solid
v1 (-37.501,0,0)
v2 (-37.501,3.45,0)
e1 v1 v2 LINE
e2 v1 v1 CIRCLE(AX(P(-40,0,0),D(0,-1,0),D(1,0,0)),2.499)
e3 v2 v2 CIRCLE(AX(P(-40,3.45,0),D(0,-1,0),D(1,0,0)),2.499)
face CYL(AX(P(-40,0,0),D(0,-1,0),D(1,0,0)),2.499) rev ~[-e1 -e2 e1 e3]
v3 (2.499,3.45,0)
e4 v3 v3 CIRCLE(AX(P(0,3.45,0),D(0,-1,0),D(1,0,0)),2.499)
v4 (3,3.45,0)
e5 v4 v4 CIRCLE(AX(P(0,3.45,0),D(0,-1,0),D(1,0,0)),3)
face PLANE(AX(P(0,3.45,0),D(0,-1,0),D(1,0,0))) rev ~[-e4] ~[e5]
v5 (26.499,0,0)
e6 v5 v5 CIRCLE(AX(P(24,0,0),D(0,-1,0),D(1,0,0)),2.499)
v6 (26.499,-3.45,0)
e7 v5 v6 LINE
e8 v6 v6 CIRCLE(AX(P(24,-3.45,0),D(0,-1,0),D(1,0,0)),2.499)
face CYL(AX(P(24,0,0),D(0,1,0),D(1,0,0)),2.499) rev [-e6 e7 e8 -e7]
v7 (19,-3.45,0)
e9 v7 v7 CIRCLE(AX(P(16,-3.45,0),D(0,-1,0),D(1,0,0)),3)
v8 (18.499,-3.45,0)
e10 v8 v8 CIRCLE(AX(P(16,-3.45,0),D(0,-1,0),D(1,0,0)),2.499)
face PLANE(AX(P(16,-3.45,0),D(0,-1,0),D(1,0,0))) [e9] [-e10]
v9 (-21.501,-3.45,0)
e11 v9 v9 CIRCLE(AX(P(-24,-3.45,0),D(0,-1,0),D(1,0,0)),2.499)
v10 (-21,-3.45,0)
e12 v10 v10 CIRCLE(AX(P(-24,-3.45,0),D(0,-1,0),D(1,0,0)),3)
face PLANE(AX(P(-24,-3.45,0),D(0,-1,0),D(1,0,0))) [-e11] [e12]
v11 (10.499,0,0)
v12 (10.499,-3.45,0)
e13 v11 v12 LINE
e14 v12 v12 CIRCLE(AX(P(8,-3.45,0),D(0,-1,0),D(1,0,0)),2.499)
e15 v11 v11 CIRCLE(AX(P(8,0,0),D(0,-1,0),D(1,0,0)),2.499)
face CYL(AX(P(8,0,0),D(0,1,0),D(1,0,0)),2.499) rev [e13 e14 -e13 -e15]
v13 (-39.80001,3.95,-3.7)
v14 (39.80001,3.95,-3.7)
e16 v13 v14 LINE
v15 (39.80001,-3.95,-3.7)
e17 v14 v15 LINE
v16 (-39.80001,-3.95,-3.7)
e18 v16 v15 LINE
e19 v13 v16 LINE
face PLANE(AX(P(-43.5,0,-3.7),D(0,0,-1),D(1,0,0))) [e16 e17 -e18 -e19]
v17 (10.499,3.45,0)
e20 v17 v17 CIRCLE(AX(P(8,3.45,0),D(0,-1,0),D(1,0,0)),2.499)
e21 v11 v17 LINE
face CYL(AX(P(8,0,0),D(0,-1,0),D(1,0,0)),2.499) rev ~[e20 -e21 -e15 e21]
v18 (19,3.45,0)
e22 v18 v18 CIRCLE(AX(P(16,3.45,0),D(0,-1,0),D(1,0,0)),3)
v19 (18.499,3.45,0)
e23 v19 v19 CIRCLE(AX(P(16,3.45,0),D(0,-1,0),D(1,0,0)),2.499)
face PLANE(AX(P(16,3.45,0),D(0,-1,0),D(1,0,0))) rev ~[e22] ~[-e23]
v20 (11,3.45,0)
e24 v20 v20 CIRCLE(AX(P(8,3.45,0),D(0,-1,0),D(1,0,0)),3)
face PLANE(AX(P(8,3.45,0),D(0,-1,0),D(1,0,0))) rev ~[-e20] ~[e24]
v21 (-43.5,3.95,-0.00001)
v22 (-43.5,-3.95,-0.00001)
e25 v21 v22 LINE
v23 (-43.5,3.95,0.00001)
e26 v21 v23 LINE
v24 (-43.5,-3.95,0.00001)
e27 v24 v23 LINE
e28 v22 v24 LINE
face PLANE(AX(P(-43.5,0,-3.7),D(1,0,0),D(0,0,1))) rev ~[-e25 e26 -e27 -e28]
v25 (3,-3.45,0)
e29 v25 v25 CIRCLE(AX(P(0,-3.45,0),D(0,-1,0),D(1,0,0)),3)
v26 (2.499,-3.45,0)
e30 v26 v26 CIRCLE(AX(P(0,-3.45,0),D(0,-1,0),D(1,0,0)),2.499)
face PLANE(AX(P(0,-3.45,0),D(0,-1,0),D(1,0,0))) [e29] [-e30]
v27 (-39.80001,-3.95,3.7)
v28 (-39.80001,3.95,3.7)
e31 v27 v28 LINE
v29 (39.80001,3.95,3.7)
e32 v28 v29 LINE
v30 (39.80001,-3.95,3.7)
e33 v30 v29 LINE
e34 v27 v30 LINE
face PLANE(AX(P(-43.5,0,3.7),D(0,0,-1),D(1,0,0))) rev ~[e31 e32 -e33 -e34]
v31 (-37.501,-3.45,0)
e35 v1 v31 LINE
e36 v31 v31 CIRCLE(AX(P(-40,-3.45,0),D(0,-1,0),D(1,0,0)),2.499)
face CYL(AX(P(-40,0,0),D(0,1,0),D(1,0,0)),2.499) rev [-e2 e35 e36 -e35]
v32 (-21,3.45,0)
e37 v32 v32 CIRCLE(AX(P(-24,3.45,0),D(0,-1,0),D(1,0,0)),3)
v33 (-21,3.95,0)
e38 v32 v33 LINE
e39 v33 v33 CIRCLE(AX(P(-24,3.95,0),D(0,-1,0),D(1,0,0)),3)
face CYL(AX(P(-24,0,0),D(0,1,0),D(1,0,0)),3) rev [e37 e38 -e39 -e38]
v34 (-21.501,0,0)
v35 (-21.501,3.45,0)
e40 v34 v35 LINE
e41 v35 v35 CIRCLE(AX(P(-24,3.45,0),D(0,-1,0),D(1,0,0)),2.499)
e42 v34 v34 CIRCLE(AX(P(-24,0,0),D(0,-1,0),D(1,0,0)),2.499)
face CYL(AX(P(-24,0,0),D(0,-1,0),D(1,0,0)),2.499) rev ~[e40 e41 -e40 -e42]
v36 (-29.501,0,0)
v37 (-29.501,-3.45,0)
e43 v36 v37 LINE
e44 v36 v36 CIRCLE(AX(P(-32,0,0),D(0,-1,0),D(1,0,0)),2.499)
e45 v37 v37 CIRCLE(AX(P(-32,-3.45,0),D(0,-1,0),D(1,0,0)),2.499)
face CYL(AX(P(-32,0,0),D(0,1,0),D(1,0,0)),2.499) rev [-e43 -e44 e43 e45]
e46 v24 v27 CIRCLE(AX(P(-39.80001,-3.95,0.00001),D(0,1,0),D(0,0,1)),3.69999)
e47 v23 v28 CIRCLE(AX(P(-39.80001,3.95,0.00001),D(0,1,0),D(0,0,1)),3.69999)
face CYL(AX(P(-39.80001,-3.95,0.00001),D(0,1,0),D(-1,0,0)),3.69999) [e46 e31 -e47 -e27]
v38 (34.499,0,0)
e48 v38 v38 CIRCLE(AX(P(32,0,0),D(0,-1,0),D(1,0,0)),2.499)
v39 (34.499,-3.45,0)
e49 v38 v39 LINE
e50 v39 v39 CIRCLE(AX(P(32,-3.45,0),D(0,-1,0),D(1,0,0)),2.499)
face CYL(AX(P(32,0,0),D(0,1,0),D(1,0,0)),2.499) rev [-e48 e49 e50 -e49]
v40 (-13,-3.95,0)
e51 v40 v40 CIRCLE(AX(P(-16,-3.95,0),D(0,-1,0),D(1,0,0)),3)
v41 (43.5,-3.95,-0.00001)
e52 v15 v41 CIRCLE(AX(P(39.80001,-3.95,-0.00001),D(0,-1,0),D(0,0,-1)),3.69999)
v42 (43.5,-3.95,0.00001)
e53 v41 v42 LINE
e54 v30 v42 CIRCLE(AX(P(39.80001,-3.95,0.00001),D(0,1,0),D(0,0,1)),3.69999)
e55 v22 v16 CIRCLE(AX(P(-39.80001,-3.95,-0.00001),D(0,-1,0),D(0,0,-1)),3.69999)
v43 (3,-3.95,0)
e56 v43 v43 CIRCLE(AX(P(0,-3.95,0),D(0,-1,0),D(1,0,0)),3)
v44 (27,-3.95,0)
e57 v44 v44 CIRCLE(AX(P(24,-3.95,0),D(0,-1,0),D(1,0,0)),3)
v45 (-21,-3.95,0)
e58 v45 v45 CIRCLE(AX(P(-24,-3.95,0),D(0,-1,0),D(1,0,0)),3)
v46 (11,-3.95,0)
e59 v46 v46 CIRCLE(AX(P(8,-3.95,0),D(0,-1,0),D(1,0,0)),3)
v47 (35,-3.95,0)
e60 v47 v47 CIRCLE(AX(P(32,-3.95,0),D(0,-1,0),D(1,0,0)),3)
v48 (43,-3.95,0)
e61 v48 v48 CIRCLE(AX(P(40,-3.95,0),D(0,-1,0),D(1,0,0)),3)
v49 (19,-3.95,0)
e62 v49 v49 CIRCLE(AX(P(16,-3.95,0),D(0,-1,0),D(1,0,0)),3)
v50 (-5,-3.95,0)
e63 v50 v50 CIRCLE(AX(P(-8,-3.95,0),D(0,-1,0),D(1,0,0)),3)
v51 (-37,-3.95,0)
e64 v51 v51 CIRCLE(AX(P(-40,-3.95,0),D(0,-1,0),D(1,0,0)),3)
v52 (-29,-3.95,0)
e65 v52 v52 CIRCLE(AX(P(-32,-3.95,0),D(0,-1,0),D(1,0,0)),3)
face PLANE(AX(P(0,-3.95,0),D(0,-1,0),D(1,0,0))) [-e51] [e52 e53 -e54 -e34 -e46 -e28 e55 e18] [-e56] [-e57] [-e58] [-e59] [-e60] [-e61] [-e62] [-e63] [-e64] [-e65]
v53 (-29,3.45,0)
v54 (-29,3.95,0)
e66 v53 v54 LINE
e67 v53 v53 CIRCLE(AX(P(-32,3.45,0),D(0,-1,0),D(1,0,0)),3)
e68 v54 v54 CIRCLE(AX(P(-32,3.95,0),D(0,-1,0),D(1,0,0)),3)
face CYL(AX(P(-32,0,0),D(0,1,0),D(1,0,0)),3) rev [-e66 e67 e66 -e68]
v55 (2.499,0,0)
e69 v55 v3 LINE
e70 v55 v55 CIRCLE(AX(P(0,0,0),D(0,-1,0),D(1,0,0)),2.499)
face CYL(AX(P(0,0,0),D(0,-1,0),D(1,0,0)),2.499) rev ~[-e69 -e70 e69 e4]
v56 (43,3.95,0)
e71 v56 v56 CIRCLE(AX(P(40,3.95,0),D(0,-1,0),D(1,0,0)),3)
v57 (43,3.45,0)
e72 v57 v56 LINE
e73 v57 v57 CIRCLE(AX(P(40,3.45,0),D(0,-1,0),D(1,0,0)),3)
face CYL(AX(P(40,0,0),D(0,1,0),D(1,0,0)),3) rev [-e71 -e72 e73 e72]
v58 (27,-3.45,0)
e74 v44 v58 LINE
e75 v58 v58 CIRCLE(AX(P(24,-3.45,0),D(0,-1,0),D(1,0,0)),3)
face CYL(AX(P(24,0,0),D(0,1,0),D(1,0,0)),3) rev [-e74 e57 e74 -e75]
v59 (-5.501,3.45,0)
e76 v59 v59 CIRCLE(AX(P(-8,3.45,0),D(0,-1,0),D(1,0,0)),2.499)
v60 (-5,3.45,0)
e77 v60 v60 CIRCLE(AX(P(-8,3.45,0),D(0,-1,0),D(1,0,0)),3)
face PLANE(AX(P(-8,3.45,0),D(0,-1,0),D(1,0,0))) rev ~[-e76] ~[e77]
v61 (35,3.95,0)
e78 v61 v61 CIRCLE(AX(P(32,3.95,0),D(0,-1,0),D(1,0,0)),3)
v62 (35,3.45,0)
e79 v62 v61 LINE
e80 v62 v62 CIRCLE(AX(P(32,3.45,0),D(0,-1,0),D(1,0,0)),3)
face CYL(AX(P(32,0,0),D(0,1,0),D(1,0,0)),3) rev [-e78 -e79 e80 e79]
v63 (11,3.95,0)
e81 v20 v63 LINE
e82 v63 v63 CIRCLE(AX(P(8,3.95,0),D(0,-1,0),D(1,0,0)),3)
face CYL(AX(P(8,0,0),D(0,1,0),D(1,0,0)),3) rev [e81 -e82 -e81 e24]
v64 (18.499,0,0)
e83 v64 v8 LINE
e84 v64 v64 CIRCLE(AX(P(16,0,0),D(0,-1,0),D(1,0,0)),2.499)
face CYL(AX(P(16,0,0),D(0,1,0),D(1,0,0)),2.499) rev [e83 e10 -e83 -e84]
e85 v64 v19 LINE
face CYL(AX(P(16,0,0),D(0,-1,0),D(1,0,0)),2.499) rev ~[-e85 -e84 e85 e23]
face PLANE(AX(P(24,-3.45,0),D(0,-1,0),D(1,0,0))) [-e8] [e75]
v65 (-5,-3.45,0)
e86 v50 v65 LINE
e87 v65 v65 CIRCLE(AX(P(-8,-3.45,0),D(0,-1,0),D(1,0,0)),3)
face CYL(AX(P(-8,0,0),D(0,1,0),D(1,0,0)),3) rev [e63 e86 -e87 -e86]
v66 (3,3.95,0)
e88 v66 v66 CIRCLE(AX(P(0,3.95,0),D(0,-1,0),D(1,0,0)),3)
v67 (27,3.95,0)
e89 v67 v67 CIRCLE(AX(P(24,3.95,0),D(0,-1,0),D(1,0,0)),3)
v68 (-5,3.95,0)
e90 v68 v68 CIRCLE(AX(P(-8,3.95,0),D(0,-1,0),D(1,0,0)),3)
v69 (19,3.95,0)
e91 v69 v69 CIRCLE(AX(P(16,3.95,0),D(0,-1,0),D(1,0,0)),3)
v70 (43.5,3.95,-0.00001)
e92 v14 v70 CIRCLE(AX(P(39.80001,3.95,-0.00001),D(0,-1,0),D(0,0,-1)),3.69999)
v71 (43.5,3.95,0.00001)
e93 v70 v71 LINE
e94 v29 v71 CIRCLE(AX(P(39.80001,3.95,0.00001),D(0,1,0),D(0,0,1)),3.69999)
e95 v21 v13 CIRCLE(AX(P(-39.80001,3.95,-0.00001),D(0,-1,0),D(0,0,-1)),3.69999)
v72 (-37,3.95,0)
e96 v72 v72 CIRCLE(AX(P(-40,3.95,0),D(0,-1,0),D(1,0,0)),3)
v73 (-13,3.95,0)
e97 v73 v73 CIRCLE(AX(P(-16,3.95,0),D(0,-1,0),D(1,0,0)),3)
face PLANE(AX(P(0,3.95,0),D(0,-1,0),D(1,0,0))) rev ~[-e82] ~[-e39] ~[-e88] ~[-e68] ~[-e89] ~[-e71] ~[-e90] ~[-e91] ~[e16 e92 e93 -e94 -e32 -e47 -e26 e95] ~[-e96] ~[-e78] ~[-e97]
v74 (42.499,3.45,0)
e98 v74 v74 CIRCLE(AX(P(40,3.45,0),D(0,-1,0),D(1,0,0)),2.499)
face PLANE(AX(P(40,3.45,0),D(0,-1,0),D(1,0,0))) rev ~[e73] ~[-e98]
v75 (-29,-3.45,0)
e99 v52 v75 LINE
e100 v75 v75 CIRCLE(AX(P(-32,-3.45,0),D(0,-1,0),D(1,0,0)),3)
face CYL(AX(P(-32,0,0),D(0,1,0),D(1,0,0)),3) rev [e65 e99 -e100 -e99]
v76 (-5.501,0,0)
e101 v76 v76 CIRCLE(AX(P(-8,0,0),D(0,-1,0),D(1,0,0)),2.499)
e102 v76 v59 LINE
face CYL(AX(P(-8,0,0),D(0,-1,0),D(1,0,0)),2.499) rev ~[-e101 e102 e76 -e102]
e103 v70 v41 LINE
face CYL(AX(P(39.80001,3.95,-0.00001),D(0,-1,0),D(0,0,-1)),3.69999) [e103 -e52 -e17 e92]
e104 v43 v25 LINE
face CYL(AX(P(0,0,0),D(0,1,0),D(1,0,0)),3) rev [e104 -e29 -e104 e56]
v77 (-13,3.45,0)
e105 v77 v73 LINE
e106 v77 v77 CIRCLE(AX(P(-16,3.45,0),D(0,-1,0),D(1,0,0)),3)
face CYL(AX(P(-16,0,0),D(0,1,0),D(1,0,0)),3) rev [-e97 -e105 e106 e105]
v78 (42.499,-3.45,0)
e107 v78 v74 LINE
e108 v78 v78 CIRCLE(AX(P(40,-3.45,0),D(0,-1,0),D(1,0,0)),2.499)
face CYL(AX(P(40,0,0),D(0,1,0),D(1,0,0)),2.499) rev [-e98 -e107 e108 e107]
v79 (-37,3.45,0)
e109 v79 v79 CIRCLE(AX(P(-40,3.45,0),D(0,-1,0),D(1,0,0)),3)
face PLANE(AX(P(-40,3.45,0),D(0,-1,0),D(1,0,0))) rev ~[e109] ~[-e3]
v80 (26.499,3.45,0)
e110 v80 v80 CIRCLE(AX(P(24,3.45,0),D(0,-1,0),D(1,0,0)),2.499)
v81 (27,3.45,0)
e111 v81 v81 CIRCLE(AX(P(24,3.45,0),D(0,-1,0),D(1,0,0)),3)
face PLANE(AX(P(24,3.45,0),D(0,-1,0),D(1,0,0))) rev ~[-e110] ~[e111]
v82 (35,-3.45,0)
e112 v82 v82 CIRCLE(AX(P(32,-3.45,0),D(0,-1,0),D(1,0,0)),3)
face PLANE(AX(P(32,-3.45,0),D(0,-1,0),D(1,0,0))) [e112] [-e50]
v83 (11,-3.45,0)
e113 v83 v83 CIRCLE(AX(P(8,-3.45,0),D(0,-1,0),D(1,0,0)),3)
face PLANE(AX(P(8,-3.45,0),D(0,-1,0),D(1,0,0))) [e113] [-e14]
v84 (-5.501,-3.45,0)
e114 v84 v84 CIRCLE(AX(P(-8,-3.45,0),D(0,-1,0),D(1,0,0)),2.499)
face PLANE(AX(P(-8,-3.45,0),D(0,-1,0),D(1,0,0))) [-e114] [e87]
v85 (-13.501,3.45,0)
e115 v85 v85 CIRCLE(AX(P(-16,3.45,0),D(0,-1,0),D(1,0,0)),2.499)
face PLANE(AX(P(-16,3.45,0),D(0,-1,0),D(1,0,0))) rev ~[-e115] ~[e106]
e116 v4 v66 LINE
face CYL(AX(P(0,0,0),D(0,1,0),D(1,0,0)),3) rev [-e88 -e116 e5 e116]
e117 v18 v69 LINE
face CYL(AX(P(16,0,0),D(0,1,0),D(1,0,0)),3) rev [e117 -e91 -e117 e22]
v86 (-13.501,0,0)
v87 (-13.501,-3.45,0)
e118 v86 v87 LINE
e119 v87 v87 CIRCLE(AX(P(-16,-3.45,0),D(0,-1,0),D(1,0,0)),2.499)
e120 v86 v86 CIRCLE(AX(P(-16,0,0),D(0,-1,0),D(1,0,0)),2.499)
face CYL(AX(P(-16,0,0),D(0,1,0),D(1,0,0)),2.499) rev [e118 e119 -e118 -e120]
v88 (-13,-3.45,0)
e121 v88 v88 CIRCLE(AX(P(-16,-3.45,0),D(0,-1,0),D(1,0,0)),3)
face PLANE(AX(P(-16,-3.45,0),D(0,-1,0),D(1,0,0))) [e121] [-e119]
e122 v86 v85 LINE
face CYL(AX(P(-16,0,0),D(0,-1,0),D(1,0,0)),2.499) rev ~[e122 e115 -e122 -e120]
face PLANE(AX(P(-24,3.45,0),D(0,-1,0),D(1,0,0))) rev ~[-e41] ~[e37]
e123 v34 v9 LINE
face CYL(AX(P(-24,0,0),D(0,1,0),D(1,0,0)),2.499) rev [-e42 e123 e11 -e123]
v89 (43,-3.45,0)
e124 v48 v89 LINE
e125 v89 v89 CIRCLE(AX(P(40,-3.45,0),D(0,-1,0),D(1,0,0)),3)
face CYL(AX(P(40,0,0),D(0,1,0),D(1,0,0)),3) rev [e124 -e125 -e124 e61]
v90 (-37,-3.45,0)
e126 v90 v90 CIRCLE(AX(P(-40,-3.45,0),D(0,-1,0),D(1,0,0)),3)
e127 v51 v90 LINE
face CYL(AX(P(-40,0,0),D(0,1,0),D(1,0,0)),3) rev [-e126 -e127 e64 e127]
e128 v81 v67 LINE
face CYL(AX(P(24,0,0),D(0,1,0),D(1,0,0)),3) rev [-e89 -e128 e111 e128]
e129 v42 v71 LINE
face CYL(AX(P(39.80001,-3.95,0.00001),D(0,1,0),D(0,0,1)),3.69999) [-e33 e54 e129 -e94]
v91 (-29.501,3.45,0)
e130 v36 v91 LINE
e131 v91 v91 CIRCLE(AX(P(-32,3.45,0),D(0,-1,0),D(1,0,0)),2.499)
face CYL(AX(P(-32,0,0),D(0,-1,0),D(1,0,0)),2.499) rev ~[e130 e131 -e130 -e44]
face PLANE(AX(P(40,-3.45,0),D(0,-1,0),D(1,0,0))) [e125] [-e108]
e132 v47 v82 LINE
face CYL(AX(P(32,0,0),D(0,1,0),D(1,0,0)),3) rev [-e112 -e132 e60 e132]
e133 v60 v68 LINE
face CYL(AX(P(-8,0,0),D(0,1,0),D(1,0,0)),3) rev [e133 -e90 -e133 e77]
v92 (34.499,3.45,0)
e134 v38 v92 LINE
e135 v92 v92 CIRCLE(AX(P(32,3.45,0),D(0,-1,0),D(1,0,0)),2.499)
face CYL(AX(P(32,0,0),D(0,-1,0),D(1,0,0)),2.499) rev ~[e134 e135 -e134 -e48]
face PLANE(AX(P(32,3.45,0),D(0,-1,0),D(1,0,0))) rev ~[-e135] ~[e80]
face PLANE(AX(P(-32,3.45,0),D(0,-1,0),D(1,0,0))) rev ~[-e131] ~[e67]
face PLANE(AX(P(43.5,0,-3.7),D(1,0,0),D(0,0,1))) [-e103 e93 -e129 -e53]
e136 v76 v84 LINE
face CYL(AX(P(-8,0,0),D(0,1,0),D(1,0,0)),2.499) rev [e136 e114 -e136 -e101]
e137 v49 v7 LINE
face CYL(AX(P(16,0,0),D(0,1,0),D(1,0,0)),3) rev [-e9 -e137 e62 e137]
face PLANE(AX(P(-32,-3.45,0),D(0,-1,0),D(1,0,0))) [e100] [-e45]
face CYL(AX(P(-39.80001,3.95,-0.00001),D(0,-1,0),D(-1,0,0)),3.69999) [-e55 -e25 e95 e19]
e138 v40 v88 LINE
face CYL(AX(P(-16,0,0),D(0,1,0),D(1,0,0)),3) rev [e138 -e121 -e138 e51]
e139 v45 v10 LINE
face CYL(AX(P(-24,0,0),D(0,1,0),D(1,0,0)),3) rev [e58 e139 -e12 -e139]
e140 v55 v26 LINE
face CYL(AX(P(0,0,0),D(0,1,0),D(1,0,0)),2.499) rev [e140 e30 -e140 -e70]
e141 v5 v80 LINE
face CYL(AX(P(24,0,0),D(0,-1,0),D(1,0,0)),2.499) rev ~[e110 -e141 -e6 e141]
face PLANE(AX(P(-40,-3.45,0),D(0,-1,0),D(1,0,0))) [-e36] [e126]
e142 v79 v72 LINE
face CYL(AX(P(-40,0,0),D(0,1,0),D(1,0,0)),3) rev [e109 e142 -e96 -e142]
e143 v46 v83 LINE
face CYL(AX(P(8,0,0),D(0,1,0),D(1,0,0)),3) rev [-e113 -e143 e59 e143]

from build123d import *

# Parameters (mm, degrees)
F0_W     = 87
F0_H     = 7.4
F0_R     = 3
F1_DEPTH = 3.95
F0_R_2   = 2.499
F2_DEPTH = 3.45
F3_R     = 3.69999


# Not quite as in the source:
# - a fillet or chamfer is up to 0.001 mm smaller than in the source, because OpenCascade refuses the exact size


with BuildPart() as f1:
    # F0 (on Front) → F1 (new body, symmetric)
    with BuildSketch(Plane.XZ):
        Rectangle(F0_W, F0_H)
        with Locations((-40, 0)):
            Circle(F0_R, mode=Mode.SUBTRACT)
        with Locations((-32, 0)):
            Circle(F0_R, mode=Mode.SUBTRACT)
        with Locations((-24, 0)):
            Circle(F0_R, mode=Mode.SUBTRACT)
        with Locations((-16, 0)):
            Circle(F0_R, mode=Mode.SUBTRACT)
        with Locations((-8, 0)):
            Circle(F0_R, mode=Mode.SUBTRACT)
        Circle(F0_R, mode=Mode.SUBTRACT)
        with Locations((8, 0)):
            Circle(F0_R, mode=Mode.SUBTRACT)
        with Locations((16, 0)):
            Circle(F0_R, mode=Mode.SUBTRACT)
        with Locations((24, 0)):
            Circle(F0_R, mode=Mode.SUBTRACT)
        with Locations((32, 0)):
            Circle(F0_R, mode=Mode.SUBTRACT)
        with Locations((40, 0)):
            Circle(F0_R, mode=Mode.SUBTRACT)
    extrude(amount=F1_DEPTH, both=True)

    # F0 (on Front) → F2 (join, symmetric)
    with BuildSketch(Plane.XZ):
        with Locations((-40, 0)):
            Circle(F0_R)
        with Locations((-40, 0)):
            Circle(F0_R_2, mode=Mode.SUBTRACT)
        with Locations((-32, 0)):
            Circle(F0_R)
        with Locations((-32, 0)):
            Circle(F0_R_2, mode=Mode.SUBTRACT)
        with Locations((-24, 0)):
            Circle(F0_R)
        with Locations((-24, 0)):
            Circle(F0_R_2, mode=Mode.SUBTRACT)
        with Locations((-16, 0)):
            Circle(F0_R)
        with Locations((-16, 0)):
            Circle(F0_R_2, mode=Mode.SUBTRACT)
        with Locations((-8, 0)):
            Circle(F0_R)
        with Locations((-8, 0)):
            Circle(F0_R_2, mode=Mode.SUBTRACT)
        Circle(F0_R)
        Circle(F0_R_2, mode=Mode.SUBTRACT)
        with Locations((8, 0)):
            Circle(F0_R)
        with Locations((8, 0)):
            Circle(F0_R_2, mode=Mode.SUBTRACT)
        with Locations((16, 0)):
            Circle(F0_R)
        with Locations((16, 0)):
            Circle(F0_R_2, mode=Mode.SUBTRACT)
        with Locations((24, 0)):
            Circle(F0_R)
        with Locations((24, 0)):
            Circle(F0_R_2, mode=Mode.SUBTRACT)
        with Locations((32, 0)):
            Circle(F0_R)
        with Locations((32, 0)):
            Circle(F0_R_2, mode=Mode.SUBTRACT)
        with Locations((40, 0)):
            Circle(F0_R)
        with Locations((40, 0)):
            Circle(F0_R_2, mode=Mode.SUBTRACT)
    extrude(amount=F2_DEPTH, both=True)

    # F3 (radius 3.7 in the source; OpenCascade refuses exactly that, so slightly less here)
    f3_edges = [f1.edges().sort_by_distance(p)[0] for p in [
        (-43.5, 0, 3.7),
        (-43.5, 0, -3.7),
        (43.5, 0, 3.7),
        (43.5, 0, -3.7),
    ]]
    fillet(f3_edges, radius=F3_R)


solid = f1.part
